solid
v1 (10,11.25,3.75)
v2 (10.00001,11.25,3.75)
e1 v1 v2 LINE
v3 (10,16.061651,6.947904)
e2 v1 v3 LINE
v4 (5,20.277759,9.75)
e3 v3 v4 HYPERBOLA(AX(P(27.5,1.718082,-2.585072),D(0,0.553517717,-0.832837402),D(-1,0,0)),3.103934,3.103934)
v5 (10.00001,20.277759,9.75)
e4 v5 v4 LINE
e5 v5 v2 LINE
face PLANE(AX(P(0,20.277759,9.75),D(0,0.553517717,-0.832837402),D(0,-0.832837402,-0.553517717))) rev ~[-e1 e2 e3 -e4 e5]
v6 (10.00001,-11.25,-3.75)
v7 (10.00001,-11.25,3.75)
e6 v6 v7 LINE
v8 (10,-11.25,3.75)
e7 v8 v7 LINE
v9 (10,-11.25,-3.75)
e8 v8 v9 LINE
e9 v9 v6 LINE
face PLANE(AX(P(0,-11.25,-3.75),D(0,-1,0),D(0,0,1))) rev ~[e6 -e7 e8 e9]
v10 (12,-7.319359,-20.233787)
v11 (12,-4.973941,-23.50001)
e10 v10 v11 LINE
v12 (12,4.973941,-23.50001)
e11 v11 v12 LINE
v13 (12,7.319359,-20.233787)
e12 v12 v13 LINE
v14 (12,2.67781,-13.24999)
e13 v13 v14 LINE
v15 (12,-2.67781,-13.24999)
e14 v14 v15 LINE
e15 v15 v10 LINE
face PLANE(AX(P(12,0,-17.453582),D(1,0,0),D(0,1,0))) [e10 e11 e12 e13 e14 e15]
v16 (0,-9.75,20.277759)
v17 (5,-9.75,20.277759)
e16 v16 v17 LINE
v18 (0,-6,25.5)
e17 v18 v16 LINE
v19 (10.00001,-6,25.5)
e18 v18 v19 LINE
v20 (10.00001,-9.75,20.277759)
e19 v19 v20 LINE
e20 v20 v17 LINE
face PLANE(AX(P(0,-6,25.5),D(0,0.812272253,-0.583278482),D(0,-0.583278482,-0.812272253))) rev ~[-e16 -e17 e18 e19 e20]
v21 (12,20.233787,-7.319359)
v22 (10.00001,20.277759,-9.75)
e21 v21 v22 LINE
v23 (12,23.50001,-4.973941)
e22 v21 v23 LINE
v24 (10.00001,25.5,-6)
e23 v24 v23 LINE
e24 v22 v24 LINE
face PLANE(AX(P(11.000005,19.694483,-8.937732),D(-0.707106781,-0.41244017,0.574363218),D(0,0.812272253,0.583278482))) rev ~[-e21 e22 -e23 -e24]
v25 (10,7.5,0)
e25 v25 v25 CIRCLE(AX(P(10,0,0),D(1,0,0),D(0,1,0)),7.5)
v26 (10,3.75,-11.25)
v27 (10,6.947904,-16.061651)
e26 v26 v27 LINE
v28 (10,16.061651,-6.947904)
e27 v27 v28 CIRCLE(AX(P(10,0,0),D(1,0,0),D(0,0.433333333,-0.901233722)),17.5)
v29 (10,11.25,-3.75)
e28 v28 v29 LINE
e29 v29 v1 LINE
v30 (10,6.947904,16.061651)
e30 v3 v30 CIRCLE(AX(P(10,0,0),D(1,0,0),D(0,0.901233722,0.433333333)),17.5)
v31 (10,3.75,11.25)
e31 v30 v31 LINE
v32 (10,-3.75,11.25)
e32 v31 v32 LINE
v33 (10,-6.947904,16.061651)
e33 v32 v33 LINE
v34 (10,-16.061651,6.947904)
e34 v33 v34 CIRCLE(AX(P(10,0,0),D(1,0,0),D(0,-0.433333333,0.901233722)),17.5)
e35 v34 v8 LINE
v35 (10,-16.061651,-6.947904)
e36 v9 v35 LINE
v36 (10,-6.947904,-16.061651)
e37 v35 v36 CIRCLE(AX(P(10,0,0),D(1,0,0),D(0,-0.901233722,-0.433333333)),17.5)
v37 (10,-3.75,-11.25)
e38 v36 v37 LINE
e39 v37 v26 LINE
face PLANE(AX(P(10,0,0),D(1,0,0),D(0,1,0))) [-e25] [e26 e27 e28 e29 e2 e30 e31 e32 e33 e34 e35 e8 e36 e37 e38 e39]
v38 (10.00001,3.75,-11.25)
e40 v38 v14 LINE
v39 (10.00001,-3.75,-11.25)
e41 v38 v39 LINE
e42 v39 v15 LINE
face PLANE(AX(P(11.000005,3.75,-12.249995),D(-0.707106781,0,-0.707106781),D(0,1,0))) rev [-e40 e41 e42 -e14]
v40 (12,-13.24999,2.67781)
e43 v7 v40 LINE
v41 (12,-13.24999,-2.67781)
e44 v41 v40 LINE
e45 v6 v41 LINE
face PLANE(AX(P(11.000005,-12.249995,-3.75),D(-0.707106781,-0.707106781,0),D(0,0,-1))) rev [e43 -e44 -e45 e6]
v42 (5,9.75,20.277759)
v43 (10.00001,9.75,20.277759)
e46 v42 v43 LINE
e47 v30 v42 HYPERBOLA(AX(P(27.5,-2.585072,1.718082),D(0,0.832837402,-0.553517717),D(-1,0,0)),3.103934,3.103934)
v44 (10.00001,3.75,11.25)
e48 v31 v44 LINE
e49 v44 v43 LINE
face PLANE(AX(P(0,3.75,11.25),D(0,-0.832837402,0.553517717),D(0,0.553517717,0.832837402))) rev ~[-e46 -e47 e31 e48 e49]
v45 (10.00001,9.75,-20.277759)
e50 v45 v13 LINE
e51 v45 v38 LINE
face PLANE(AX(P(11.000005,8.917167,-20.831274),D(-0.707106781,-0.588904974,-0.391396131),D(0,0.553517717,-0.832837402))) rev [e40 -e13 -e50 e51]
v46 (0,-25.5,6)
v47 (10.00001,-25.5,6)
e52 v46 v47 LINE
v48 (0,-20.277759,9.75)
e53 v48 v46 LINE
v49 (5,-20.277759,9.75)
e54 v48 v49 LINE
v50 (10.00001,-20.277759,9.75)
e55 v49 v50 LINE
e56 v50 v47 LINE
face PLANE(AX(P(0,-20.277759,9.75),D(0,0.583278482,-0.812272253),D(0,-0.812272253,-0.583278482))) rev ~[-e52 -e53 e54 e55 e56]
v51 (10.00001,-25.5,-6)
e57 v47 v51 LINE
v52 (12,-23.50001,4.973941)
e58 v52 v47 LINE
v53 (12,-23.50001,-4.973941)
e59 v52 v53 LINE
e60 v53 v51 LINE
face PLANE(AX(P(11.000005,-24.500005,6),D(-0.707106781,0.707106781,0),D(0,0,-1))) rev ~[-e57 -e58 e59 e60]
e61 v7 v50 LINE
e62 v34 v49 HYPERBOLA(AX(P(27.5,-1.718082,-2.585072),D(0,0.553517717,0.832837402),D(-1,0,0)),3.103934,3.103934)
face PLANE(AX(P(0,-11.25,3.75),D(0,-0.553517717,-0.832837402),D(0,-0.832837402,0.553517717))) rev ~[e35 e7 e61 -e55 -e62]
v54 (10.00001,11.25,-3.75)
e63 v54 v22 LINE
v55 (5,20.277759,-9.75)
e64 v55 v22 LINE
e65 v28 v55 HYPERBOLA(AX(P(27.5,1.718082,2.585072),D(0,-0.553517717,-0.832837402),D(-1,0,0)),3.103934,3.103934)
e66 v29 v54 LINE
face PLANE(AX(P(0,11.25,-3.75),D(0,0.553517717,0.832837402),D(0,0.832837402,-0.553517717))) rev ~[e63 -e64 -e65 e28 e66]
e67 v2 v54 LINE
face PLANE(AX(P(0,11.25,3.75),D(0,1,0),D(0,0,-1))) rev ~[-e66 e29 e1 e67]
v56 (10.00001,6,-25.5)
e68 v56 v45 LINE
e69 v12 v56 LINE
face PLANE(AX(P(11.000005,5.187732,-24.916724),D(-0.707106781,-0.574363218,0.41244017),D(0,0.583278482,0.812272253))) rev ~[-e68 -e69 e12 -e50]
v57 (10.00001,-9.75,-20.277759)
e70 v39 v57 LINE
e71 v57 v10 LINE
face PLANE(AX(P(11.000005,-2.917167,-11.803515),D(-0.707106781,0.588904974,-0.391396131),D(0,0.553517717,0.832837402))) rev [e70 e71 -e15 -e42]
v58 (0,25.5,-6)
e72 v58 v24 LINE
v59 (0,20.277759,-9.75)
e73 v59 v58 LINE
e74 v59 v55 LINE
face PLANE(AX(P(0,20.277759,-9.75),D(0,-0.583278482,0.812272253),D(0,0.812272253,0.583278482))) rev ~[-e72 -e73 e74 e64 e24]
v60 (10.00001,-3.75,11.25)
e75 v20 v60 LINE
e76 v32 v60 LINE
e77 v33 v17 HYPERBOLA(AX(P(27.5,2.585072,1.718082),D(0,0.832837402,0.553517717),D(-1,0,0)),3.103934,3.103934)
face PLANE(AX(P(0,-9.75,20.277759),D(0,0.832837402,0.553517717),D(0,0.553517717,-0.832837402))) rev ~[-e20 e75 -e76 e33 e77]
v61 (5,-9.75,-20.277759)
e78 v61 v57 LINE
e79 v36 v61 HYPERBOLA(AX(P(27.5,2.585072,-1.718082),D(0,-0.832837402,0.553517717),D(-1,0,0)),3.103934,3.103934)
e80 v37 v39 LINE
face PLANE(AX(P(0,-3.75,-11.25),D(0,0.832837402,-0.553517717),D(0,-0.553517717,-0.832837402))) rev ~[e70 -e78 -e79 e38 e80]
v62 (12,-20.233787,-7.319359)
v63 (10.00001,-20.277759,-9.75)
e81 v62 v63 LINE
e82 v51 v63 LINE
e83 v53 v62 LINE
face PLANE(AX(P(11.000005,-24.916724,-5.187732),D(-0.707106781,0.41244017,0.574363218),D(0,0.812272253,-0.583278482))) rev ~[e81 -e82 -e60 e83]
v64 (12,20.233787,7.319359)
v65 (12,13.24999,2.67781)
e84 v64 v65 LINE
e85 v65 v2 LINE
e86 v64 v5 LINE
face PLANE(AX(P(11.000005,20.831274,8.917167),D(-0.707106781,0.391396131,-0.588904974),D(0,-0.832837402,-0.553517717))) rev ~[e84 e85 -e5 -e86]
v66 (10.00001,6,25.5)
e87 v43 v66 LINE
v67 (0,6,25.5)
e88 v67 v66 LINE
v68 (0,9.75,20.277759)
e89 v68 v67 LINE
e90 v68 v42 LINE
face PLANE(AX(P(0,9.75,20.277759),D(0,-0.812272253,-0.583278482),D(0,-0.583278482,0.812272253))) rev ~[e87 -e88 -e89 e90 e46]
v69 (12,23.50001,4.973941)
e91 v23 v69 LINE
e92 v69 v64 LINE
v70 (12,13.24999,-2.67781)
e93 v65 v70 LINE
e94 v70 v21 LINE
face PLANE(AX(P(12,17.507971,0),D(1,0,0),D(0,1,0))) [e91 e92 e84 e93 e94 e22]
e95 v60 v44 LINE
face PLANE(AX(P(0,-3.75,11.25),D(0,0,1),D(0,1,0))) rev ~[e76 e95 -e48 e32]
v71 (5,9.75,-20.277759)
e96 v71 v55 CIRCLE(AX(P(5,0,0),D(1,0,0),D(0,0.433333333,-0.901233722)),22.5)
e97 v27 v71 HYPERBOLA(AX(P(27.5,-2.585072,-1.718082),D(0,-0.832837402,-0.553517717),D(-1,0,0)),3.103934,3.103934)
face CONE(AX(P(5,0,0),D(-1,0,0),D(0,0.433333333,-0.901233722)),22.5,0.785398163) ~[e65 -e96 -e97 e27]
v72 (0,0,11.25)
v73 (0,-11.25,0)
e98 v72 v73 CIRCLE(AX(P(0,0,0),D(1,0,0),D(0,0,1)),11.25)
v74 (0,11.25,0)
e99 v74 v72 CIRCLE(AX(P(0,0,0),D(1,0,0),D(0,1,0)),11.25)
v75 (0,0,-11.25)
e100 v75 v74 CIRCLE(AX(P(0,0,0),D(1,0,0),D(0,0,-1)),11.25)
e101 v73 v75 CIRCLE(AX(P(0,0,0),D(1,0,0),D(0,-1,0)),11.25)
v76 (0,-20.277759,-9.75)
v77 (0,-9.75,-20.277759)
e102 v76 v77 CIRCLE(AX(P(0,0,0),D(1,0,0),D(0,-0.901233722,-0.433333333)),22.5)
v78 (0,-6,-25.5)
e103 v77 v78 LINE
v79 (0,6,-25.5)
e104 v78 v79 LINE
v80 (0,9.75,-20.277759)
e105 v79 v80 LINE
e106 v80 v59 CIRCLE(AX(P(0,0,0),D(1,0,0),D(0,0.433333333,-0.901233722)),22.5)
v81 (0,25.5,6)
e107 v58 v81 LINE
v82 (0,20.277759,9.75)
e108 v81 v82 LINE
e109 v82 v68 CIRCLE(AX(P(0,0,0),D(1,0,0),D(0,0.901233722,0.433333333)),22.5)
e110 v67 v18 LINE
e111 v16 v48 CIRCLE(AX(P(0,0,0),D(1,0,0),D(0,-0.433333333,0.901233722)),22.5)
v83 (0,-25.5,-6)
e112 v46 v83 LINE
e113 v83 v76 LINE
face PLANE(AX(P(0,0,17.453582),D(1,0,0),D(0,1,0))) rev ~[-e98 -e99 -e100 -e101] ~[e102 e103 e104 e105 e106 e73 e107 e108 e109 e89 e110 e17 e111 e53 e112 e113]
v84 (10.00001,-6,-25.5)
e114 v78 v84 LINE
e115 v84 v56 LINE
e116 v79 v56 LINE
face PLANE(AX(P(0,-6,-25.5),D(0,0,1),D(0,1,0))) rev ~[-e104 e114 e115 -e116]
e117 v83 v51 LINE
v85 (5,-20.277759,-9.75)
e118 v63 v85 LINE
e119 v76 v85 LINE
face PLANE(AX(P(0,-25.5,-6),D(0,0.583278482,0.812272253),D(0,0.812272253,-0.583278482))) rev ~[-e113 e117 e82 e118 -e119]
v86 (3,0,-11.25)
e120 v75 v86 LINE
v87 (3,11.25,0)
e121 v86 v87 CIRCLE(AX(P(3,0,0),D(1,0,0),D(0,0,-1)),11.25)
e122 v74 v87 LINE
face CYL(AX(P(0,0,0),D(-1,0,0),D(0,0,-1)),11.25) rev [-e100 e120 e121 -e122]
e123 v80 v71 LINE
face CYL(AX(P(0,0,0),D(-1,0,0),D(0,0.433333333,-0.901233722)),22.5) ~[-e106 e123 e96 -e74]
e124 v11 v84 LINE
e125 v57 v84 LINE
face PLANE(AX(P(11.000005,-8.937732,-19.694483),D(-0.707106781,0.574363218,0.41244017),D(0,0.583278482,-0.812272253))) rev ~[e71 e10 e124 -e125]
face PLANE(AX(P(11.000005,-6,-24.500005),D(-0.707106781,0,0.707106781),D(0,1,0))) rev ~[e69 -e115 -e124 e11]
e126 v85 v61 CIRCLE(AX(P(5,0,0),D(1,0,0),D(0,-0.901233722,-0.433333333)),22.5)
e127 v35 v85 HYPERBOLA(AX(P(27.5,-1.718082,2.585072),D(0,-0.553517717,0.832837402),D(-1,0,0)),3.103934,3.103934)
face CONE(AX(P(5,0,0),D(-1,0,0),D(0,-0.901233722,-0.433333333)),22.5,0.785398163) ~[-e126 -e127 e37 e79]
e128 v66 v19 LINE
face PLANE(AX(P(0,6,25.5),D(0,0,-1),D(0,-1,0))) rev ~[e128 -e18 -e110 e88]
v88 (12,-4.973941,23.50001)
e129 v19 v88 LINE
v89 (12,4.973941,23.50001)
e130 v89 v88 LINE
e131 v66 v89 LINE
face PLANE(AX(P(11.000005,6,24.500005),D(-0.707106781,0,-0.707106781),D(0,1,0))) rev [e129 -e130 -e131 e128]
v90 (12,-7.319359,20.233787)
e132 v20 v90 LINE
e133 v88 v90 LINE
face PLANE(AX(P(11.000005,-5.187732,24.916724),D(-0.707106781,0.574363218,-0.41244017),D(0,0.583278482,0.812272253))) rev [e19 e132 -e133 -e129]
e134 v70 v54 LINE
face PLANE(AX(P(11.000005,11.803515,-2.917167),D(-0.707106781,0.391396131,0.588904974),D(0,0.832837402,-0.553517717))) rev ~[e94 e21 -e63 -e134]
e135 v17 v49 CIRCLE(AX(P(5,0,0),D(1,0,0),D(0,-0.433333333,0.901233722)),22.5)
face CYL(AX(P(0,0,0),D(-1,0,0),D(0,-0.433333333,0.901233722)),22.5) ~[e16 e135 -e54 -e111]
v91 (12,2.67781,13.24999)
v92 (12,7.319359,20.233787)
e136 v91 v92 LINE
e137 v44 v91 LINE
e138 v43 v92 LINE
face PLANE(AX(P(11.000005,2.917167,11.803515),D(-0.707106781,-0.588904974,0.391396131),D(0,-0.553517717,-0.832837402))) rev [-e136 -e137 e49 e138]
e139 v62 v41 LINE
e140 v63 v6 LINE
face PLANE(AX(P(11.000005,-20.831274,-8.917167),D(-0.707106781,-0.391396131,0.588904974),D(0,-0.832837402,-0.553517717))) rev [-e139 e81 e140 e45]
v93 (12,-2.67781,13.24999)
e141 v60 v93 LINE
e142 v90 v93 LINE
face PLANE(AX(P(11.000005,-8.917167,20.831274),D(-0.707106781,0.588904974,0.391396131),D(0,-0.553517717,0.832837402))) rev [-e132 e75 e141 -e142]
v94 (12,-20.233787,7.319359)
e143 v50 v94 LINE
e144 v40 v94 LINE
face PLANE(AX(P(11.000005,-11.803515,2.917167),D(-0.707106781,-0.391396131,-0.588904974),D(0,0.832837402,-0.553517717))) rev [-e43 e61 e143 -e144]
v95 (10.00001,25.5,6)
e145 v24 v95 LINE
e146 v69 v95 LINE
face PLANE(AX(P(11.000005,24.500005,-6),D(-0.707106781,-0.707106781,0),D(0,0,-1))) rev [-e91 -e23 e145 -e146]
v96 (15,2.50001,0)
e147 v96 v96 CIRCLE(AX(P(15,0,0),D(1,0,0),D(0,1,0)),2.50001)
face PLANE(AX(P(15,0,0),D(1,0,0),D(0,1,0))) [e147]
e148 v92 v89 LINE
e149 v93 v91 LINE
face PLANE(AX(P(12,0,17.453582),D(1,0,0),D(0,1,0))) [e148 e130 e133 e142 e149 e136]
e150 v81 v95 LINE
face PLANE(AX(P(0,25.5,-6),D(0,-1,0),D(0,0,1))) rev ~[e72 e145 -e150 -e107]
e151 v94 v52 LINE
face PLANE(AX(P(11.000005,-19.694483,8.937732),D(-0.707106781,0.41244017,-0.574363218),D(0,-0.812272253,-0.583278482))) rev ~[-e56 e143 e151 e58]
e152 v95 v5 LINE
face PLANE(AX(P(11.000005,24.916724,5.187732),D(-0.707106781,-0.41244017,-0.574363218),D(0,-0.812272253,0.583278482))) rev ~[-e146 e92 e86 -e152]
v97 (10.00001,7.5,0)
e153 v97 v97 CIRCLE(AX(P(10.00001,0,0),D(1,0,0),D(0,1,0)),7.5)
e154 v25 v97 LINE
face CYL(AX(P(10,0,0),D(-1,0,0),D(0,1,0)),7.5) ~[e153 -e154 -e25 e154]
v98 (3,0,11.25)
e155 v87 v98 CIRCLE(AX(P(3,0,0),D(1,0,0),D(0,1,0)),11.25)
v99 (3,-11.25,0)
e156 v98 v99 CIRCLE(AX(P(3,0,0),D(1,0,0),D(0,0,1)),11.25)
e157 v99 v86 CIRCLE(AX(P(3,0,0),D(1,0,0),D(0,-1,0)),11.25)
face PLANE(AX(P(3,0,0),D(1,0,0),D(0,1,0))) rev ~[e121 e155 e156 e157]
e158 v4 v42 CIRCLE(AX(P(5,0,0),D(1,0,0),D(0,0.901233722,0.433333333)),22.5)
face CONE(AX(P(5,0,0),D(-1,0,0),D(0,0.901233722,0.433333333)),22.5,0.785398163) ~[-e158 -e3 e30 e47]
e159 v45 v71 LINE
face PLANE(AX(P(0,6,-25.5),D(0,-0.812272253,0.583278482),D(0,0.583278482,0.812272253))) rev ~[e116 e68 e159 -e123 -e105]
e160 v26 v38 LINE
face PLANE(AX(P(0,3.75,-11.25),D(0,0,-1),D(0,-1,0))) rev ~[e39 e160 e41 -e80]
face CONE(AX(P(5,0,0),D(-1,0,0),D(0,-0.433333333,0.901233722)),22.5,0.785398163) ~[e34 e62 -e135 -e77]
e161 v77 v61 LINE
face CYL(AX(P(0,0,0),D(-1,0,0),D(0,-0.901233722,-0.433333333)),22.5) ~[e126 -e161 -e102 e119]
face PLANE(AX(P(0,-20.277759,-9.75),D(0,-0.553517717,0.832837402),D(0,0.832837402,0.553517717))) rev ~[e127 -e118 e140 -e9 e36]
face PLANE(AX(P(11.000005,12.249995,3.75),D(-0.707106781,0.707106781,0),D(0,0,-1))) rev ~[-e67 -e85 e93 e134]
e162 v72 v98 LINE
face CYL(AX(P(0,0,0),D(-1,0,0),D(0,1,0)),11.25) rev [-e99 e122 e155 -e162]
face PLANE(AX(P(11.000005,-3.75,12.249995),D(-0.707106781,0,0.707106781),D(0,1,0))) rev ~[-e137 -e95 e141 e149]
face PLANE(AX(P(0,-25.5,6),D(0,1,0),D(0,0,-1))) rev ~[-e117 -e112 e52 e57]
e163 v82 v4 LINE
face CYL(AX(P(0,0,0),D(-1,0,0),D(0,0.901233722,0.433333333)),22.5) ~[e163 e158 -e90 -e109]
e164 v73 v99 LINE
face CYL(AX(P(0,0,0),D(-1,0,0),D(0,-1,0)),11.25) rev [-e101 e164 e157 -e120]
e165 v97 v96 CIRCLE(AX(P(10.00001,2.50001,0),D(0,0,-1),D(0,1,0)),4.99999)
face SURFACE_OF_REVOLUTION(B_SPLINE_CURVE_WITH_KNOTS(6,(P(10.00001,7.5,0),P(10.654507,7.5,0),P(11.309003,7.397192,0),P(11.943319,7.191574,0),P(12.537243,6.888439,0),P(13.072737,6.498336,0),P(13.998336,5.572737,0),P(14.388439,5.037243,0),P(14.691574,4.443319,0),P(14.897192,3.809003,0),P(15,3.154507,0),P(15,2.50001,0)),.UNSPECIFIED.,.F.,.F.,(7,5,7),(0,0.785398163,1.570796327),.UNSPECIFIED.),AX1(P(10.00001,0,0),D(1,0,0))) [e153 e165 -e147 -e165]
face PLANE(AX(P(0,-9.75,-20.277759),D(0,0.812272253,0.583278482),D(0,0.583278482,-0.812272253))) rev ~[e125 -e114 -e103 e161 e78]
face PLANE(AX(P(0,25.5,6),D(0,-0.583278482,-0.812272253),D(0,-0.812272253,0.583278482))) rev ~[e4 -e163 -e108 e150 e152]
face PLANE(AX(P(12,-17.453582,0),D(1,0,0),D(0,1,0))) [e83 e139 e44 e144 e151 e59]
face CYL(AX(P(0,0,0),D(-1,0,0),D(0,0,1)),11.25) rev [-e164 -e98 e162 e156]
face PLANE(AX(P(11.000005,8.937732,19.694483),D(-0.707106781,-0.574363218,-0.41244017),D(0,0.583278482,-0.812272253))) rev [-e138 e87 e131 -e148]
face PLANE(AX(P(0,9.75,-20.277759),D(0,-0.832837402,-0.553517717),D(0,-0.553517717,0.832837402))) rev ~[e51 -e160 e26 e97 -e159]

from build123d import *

# Parameters (mm, degrees)
F1_DEPTH = 10
F2_DEPTH = 12
F3_SIZE  = 5
F4_SIZE  = 1.99999
F5_R     = 7.5
F6_DEPTH = 5
F7_R     = 4.99999
F9_DEPTH = 3


# Not quite as in the source:
# - a fillet or chamfer is up to 0.001 mm smaller than in the source, because OpenCascade refuses the exact size
# - a feature names something its author has since deleted; it is built from what else it names


with BuildPart() as f1:
    # F0 (on Right) → F1 (new body)
    with BuildSketch(Plane.YZ):
        with BuildLine():
            Line((11.25, 3.75), (20.2777587519, 9.75))
            ThreePointArc((20.2777587519, 9.75), (15.9099025767, 15.9099025767), (9.75, 20.2777587519))
            Line((9.75, 20.2777587519), (3.75, 11.25))
            Line((3.75, 11.25), (0, 11.25))
            Line((0, 11.25), (-3.75, 11.25))
            Line((-3.75, 11.25), (-9.75, 20.2777587519))
            ThreePointArc((-9.75, 20.2777587519), (-15.9099025767, 15.9099025767), (-20.2777587519, 9.75))
            Line((-20.2777587519, 9.75), (-11.25, 3.75))
            Line((-11.25, 3.75), (-11.25, 0))
            Line((-11.25, 0), (-11.25, -3.75))
            Line((-11.25, -3.75), (-20.2777587519, -9.75))
            ThreePointArc((-20.2777587519, -9.75), (-15.9099025767, -15.9099025767), (-9.75, -20.2777587519))
            Line((-9.75, -20.2777587519), (-3.75, -11.25))
            Line((-3.75, -11.25), (0, -11.25))
            Line((0, -11.25), (3.75, -11.25))
            Line((3.75, -11.25), (9.75, -20.2777587519))
            ThreePointArc((9.75, -20.2777587519), (15.9099025767, -15.9099025767), (20.2777587519, -9.75))
            Line((20.2777587519, -9.75), (11.25, -3.75))
            Line((11.25, -3.75), (11.25, 0))
            Line((11.25, 0), (11.25, 3.75))
        make_face()
    extrude(amount=F1_DEPTH)

    # F0 (on Right) → F2 (join)
    with BuildSketch(Plane.YZ):
        with BuildLine():
            Line((3.75, 11.25), (9.75, 20.2777587519))
            ThreePointArc((9.75, 20.2777587519), (0, 22.5), (-9.75, 20.2777587519))
            Line((-9.75, 20.2777587519), (-3.75, 11.25))
            Line((-3.75, 11.25), (0, 11.25))
            Line((0, 11.25), (3.75, 11.25))
        make_face()
        with BuildLine():
            ThreePointArc((-9.75, 20.2777587519), (0, 22.5), (9.75, 20.2777587519))
            Line((9.75, 20.2777587519), (6, 25.5))
            Line((6, 25.5), (0, 25.5))
            Line((0, 25.5), (-6, 25.5))
            Line((-6, 25.5), (-9.75, 20.2777587519))
        make_face()
        with BuildLine():
            Line((-11.25, 3.75), (-20.2777587519, 9.75))
            ThreePointArc((-20.2777587519, 9.75), (-22.5, 0), (-20.2777587519, -9.75))
            Line((-20.2777587519, -9.75), (-11.25, -3.75))
            Line((-11.25, -3.75), (-11.25, 0))
            Line((-11.25, 0), (-11.25, 3.75))
        make_face()
        with BuildLine():
            ThreePointArc((-20.2777587519, -9.75), (-22.5, 0), (-20.2777587519, 9.75))
            Line((-20.2777587519, 9.75), (-25.5, 6))
            Line((-25.5, 6), (-25.5, 0))
            Line((-25.5, 0), (-25.5, -6))
            Line((-25.5, -6), (-20.2777587519, -9.75))
        make_face()
        with BuildLine():
            ThreePointArc((-9.75, -20.2777587519), (0, -22.5), (9.75, -20.2777587519))
            Line((9.75, -20.2777587519), (3.75, -11.25))
            Line((3.75, -11.25), (0, -11.25))
            Line((0, -11.25), (-3.75, -11.25))
            Line((-3.75, -11.25), (-9.75, -20.2777587519))
        make_face()
        with BuildLine():
            Line((6, -25.5), (9.75, -20.2777587519))
            ThreePointArc((9.75, -20.2777587519), (0, -22.5), (-9.75, -20.2777587519))
            Line((-9.75, -20.2777587519), (-6, -25.5))
            Line((-6, -25.5), (0, -25.5))
            Line((0, -25.5), (6, -25.5))
        make_face()
        with BuildLine():
            ThreePointArc((20.2777587519, -9.75), (21.93740609, -5.0000214041), (22.5, 0))
            ThreePointArc((22.5, 0), (21.93740609, 5.0000214041), (20.2777587519, 9.75))
            Line((20.2777587519, 9.75), (11.25, 3.75))
            Line((11.25, 3.75), (11.25, 0))
            Line((11.25, 0), (11.25, -3.75))
            Line((11.25, -3.75), (20.2777587519, -9.75))
        make_face()
        with BuildLine():
            ThreePointArc((20.2777587519, 9.75), (21.93740609, 5.0000214041), (22.5, 0))
            ThreePointArc((22.5, 0), (21.93740609, -5.0000214041), (20.2777587519, -9.75))
            Line((20.2777587519, -9.75), (25.5, -6))
            Line((25.5, -6), (25.5, 0))
            Line((25.5, 0), (25.5, 6))
            Line((25.5, 6), (20.2777587519, 9.75))
        make_face()
    extrude(amount=F2_DEPTH)

    # F3
    f3_edges = [f1.edges().sort_by_distance(p)[0] for p in [
        (10, 15.909903, 15.909903),
        (10, -15.909903, 15.909903),
        (10, -15.909903, -15.909903),
        (10, 15.909903, -15.909903),
    ]]
    chamfer(f3_edges, length=F3_SIZE)

    # F4 (size 2 in the source; OpenCascade refuses exactly that, so slightly less here)
    f4_edges = [f1.edges().sort_by_distance(p)[0] for p in [
        (12, 0, 25.5),
        (12, -7.875, 22.888879),
        (12, 7.875, 22.888879),
        (12, -6.75, 15.763879),
        (12, 6.75, 15.763879),
        (12, 0, 11.25),
        (12, -15.763879, 6.75),
        (12, -22.888879, 7.875),
        (12, -25.5, 0),
        (12, -22.888879, -7.875),
        (12, -15.763879, -6.75),
        (12, -11.25, 0),
        (12, 0, -11.25),
        (12, -6.75, -15.763879),
        (12, -7.875, -22.888879),
        (12, 6.75, -15.763879),
        (12, 0, -25.5),
        (12, 7.875, -22.888879),
        (12, 15.763879, -6.75),
        (12, 11.25, 0),
        (12, 15.763879, 6.75),
        (12, 22.888879, 7.875),
        (12, 25.5, 0),
        (12, 22.888879, -7.875),
    ]]
    chamfer(f4_edges, length=F4_SIZE)

    # F5 (on face) → F6 (join)
    with BuildSketch(Plane.YZ.offset(10)):
        Circle(F5_R)
    extrude(amount=F6_DEPTH)

    # F7 (radius 5 in the source; OpenCascade refuses exactly that, so slightly less here)
    f7_edges = [f1.edges().sort_by_distance(p)[0] for p in [
        (15, -7.5, 0),
    ]]
    fillet(f7_edges, radius=F7_R)

    # F8 (on face) → F9 (cut)
    with BuildSketch(Plane.YZ):
        with BuildLine():
            ThreePointArc((0, -11.25), (7.9549512883, -7.9549512883), (11.25, 0))
            ThreePointArc((11.25, 0), (7.9549512883, 7.9549512883), (0, 11.25))
            ThreePointArc((0, 11.25), (-7.9549512883, 7.9549512883), (-11.25, 0))
            ThreePointArc((-11.25, 0), (-7.9549512883, -7.9549512883), (0, -11.25))
        make_face()
    extrude(amount=F9_DEPTH, mode=Mode.SUBTRACT)


solid = f1.part
